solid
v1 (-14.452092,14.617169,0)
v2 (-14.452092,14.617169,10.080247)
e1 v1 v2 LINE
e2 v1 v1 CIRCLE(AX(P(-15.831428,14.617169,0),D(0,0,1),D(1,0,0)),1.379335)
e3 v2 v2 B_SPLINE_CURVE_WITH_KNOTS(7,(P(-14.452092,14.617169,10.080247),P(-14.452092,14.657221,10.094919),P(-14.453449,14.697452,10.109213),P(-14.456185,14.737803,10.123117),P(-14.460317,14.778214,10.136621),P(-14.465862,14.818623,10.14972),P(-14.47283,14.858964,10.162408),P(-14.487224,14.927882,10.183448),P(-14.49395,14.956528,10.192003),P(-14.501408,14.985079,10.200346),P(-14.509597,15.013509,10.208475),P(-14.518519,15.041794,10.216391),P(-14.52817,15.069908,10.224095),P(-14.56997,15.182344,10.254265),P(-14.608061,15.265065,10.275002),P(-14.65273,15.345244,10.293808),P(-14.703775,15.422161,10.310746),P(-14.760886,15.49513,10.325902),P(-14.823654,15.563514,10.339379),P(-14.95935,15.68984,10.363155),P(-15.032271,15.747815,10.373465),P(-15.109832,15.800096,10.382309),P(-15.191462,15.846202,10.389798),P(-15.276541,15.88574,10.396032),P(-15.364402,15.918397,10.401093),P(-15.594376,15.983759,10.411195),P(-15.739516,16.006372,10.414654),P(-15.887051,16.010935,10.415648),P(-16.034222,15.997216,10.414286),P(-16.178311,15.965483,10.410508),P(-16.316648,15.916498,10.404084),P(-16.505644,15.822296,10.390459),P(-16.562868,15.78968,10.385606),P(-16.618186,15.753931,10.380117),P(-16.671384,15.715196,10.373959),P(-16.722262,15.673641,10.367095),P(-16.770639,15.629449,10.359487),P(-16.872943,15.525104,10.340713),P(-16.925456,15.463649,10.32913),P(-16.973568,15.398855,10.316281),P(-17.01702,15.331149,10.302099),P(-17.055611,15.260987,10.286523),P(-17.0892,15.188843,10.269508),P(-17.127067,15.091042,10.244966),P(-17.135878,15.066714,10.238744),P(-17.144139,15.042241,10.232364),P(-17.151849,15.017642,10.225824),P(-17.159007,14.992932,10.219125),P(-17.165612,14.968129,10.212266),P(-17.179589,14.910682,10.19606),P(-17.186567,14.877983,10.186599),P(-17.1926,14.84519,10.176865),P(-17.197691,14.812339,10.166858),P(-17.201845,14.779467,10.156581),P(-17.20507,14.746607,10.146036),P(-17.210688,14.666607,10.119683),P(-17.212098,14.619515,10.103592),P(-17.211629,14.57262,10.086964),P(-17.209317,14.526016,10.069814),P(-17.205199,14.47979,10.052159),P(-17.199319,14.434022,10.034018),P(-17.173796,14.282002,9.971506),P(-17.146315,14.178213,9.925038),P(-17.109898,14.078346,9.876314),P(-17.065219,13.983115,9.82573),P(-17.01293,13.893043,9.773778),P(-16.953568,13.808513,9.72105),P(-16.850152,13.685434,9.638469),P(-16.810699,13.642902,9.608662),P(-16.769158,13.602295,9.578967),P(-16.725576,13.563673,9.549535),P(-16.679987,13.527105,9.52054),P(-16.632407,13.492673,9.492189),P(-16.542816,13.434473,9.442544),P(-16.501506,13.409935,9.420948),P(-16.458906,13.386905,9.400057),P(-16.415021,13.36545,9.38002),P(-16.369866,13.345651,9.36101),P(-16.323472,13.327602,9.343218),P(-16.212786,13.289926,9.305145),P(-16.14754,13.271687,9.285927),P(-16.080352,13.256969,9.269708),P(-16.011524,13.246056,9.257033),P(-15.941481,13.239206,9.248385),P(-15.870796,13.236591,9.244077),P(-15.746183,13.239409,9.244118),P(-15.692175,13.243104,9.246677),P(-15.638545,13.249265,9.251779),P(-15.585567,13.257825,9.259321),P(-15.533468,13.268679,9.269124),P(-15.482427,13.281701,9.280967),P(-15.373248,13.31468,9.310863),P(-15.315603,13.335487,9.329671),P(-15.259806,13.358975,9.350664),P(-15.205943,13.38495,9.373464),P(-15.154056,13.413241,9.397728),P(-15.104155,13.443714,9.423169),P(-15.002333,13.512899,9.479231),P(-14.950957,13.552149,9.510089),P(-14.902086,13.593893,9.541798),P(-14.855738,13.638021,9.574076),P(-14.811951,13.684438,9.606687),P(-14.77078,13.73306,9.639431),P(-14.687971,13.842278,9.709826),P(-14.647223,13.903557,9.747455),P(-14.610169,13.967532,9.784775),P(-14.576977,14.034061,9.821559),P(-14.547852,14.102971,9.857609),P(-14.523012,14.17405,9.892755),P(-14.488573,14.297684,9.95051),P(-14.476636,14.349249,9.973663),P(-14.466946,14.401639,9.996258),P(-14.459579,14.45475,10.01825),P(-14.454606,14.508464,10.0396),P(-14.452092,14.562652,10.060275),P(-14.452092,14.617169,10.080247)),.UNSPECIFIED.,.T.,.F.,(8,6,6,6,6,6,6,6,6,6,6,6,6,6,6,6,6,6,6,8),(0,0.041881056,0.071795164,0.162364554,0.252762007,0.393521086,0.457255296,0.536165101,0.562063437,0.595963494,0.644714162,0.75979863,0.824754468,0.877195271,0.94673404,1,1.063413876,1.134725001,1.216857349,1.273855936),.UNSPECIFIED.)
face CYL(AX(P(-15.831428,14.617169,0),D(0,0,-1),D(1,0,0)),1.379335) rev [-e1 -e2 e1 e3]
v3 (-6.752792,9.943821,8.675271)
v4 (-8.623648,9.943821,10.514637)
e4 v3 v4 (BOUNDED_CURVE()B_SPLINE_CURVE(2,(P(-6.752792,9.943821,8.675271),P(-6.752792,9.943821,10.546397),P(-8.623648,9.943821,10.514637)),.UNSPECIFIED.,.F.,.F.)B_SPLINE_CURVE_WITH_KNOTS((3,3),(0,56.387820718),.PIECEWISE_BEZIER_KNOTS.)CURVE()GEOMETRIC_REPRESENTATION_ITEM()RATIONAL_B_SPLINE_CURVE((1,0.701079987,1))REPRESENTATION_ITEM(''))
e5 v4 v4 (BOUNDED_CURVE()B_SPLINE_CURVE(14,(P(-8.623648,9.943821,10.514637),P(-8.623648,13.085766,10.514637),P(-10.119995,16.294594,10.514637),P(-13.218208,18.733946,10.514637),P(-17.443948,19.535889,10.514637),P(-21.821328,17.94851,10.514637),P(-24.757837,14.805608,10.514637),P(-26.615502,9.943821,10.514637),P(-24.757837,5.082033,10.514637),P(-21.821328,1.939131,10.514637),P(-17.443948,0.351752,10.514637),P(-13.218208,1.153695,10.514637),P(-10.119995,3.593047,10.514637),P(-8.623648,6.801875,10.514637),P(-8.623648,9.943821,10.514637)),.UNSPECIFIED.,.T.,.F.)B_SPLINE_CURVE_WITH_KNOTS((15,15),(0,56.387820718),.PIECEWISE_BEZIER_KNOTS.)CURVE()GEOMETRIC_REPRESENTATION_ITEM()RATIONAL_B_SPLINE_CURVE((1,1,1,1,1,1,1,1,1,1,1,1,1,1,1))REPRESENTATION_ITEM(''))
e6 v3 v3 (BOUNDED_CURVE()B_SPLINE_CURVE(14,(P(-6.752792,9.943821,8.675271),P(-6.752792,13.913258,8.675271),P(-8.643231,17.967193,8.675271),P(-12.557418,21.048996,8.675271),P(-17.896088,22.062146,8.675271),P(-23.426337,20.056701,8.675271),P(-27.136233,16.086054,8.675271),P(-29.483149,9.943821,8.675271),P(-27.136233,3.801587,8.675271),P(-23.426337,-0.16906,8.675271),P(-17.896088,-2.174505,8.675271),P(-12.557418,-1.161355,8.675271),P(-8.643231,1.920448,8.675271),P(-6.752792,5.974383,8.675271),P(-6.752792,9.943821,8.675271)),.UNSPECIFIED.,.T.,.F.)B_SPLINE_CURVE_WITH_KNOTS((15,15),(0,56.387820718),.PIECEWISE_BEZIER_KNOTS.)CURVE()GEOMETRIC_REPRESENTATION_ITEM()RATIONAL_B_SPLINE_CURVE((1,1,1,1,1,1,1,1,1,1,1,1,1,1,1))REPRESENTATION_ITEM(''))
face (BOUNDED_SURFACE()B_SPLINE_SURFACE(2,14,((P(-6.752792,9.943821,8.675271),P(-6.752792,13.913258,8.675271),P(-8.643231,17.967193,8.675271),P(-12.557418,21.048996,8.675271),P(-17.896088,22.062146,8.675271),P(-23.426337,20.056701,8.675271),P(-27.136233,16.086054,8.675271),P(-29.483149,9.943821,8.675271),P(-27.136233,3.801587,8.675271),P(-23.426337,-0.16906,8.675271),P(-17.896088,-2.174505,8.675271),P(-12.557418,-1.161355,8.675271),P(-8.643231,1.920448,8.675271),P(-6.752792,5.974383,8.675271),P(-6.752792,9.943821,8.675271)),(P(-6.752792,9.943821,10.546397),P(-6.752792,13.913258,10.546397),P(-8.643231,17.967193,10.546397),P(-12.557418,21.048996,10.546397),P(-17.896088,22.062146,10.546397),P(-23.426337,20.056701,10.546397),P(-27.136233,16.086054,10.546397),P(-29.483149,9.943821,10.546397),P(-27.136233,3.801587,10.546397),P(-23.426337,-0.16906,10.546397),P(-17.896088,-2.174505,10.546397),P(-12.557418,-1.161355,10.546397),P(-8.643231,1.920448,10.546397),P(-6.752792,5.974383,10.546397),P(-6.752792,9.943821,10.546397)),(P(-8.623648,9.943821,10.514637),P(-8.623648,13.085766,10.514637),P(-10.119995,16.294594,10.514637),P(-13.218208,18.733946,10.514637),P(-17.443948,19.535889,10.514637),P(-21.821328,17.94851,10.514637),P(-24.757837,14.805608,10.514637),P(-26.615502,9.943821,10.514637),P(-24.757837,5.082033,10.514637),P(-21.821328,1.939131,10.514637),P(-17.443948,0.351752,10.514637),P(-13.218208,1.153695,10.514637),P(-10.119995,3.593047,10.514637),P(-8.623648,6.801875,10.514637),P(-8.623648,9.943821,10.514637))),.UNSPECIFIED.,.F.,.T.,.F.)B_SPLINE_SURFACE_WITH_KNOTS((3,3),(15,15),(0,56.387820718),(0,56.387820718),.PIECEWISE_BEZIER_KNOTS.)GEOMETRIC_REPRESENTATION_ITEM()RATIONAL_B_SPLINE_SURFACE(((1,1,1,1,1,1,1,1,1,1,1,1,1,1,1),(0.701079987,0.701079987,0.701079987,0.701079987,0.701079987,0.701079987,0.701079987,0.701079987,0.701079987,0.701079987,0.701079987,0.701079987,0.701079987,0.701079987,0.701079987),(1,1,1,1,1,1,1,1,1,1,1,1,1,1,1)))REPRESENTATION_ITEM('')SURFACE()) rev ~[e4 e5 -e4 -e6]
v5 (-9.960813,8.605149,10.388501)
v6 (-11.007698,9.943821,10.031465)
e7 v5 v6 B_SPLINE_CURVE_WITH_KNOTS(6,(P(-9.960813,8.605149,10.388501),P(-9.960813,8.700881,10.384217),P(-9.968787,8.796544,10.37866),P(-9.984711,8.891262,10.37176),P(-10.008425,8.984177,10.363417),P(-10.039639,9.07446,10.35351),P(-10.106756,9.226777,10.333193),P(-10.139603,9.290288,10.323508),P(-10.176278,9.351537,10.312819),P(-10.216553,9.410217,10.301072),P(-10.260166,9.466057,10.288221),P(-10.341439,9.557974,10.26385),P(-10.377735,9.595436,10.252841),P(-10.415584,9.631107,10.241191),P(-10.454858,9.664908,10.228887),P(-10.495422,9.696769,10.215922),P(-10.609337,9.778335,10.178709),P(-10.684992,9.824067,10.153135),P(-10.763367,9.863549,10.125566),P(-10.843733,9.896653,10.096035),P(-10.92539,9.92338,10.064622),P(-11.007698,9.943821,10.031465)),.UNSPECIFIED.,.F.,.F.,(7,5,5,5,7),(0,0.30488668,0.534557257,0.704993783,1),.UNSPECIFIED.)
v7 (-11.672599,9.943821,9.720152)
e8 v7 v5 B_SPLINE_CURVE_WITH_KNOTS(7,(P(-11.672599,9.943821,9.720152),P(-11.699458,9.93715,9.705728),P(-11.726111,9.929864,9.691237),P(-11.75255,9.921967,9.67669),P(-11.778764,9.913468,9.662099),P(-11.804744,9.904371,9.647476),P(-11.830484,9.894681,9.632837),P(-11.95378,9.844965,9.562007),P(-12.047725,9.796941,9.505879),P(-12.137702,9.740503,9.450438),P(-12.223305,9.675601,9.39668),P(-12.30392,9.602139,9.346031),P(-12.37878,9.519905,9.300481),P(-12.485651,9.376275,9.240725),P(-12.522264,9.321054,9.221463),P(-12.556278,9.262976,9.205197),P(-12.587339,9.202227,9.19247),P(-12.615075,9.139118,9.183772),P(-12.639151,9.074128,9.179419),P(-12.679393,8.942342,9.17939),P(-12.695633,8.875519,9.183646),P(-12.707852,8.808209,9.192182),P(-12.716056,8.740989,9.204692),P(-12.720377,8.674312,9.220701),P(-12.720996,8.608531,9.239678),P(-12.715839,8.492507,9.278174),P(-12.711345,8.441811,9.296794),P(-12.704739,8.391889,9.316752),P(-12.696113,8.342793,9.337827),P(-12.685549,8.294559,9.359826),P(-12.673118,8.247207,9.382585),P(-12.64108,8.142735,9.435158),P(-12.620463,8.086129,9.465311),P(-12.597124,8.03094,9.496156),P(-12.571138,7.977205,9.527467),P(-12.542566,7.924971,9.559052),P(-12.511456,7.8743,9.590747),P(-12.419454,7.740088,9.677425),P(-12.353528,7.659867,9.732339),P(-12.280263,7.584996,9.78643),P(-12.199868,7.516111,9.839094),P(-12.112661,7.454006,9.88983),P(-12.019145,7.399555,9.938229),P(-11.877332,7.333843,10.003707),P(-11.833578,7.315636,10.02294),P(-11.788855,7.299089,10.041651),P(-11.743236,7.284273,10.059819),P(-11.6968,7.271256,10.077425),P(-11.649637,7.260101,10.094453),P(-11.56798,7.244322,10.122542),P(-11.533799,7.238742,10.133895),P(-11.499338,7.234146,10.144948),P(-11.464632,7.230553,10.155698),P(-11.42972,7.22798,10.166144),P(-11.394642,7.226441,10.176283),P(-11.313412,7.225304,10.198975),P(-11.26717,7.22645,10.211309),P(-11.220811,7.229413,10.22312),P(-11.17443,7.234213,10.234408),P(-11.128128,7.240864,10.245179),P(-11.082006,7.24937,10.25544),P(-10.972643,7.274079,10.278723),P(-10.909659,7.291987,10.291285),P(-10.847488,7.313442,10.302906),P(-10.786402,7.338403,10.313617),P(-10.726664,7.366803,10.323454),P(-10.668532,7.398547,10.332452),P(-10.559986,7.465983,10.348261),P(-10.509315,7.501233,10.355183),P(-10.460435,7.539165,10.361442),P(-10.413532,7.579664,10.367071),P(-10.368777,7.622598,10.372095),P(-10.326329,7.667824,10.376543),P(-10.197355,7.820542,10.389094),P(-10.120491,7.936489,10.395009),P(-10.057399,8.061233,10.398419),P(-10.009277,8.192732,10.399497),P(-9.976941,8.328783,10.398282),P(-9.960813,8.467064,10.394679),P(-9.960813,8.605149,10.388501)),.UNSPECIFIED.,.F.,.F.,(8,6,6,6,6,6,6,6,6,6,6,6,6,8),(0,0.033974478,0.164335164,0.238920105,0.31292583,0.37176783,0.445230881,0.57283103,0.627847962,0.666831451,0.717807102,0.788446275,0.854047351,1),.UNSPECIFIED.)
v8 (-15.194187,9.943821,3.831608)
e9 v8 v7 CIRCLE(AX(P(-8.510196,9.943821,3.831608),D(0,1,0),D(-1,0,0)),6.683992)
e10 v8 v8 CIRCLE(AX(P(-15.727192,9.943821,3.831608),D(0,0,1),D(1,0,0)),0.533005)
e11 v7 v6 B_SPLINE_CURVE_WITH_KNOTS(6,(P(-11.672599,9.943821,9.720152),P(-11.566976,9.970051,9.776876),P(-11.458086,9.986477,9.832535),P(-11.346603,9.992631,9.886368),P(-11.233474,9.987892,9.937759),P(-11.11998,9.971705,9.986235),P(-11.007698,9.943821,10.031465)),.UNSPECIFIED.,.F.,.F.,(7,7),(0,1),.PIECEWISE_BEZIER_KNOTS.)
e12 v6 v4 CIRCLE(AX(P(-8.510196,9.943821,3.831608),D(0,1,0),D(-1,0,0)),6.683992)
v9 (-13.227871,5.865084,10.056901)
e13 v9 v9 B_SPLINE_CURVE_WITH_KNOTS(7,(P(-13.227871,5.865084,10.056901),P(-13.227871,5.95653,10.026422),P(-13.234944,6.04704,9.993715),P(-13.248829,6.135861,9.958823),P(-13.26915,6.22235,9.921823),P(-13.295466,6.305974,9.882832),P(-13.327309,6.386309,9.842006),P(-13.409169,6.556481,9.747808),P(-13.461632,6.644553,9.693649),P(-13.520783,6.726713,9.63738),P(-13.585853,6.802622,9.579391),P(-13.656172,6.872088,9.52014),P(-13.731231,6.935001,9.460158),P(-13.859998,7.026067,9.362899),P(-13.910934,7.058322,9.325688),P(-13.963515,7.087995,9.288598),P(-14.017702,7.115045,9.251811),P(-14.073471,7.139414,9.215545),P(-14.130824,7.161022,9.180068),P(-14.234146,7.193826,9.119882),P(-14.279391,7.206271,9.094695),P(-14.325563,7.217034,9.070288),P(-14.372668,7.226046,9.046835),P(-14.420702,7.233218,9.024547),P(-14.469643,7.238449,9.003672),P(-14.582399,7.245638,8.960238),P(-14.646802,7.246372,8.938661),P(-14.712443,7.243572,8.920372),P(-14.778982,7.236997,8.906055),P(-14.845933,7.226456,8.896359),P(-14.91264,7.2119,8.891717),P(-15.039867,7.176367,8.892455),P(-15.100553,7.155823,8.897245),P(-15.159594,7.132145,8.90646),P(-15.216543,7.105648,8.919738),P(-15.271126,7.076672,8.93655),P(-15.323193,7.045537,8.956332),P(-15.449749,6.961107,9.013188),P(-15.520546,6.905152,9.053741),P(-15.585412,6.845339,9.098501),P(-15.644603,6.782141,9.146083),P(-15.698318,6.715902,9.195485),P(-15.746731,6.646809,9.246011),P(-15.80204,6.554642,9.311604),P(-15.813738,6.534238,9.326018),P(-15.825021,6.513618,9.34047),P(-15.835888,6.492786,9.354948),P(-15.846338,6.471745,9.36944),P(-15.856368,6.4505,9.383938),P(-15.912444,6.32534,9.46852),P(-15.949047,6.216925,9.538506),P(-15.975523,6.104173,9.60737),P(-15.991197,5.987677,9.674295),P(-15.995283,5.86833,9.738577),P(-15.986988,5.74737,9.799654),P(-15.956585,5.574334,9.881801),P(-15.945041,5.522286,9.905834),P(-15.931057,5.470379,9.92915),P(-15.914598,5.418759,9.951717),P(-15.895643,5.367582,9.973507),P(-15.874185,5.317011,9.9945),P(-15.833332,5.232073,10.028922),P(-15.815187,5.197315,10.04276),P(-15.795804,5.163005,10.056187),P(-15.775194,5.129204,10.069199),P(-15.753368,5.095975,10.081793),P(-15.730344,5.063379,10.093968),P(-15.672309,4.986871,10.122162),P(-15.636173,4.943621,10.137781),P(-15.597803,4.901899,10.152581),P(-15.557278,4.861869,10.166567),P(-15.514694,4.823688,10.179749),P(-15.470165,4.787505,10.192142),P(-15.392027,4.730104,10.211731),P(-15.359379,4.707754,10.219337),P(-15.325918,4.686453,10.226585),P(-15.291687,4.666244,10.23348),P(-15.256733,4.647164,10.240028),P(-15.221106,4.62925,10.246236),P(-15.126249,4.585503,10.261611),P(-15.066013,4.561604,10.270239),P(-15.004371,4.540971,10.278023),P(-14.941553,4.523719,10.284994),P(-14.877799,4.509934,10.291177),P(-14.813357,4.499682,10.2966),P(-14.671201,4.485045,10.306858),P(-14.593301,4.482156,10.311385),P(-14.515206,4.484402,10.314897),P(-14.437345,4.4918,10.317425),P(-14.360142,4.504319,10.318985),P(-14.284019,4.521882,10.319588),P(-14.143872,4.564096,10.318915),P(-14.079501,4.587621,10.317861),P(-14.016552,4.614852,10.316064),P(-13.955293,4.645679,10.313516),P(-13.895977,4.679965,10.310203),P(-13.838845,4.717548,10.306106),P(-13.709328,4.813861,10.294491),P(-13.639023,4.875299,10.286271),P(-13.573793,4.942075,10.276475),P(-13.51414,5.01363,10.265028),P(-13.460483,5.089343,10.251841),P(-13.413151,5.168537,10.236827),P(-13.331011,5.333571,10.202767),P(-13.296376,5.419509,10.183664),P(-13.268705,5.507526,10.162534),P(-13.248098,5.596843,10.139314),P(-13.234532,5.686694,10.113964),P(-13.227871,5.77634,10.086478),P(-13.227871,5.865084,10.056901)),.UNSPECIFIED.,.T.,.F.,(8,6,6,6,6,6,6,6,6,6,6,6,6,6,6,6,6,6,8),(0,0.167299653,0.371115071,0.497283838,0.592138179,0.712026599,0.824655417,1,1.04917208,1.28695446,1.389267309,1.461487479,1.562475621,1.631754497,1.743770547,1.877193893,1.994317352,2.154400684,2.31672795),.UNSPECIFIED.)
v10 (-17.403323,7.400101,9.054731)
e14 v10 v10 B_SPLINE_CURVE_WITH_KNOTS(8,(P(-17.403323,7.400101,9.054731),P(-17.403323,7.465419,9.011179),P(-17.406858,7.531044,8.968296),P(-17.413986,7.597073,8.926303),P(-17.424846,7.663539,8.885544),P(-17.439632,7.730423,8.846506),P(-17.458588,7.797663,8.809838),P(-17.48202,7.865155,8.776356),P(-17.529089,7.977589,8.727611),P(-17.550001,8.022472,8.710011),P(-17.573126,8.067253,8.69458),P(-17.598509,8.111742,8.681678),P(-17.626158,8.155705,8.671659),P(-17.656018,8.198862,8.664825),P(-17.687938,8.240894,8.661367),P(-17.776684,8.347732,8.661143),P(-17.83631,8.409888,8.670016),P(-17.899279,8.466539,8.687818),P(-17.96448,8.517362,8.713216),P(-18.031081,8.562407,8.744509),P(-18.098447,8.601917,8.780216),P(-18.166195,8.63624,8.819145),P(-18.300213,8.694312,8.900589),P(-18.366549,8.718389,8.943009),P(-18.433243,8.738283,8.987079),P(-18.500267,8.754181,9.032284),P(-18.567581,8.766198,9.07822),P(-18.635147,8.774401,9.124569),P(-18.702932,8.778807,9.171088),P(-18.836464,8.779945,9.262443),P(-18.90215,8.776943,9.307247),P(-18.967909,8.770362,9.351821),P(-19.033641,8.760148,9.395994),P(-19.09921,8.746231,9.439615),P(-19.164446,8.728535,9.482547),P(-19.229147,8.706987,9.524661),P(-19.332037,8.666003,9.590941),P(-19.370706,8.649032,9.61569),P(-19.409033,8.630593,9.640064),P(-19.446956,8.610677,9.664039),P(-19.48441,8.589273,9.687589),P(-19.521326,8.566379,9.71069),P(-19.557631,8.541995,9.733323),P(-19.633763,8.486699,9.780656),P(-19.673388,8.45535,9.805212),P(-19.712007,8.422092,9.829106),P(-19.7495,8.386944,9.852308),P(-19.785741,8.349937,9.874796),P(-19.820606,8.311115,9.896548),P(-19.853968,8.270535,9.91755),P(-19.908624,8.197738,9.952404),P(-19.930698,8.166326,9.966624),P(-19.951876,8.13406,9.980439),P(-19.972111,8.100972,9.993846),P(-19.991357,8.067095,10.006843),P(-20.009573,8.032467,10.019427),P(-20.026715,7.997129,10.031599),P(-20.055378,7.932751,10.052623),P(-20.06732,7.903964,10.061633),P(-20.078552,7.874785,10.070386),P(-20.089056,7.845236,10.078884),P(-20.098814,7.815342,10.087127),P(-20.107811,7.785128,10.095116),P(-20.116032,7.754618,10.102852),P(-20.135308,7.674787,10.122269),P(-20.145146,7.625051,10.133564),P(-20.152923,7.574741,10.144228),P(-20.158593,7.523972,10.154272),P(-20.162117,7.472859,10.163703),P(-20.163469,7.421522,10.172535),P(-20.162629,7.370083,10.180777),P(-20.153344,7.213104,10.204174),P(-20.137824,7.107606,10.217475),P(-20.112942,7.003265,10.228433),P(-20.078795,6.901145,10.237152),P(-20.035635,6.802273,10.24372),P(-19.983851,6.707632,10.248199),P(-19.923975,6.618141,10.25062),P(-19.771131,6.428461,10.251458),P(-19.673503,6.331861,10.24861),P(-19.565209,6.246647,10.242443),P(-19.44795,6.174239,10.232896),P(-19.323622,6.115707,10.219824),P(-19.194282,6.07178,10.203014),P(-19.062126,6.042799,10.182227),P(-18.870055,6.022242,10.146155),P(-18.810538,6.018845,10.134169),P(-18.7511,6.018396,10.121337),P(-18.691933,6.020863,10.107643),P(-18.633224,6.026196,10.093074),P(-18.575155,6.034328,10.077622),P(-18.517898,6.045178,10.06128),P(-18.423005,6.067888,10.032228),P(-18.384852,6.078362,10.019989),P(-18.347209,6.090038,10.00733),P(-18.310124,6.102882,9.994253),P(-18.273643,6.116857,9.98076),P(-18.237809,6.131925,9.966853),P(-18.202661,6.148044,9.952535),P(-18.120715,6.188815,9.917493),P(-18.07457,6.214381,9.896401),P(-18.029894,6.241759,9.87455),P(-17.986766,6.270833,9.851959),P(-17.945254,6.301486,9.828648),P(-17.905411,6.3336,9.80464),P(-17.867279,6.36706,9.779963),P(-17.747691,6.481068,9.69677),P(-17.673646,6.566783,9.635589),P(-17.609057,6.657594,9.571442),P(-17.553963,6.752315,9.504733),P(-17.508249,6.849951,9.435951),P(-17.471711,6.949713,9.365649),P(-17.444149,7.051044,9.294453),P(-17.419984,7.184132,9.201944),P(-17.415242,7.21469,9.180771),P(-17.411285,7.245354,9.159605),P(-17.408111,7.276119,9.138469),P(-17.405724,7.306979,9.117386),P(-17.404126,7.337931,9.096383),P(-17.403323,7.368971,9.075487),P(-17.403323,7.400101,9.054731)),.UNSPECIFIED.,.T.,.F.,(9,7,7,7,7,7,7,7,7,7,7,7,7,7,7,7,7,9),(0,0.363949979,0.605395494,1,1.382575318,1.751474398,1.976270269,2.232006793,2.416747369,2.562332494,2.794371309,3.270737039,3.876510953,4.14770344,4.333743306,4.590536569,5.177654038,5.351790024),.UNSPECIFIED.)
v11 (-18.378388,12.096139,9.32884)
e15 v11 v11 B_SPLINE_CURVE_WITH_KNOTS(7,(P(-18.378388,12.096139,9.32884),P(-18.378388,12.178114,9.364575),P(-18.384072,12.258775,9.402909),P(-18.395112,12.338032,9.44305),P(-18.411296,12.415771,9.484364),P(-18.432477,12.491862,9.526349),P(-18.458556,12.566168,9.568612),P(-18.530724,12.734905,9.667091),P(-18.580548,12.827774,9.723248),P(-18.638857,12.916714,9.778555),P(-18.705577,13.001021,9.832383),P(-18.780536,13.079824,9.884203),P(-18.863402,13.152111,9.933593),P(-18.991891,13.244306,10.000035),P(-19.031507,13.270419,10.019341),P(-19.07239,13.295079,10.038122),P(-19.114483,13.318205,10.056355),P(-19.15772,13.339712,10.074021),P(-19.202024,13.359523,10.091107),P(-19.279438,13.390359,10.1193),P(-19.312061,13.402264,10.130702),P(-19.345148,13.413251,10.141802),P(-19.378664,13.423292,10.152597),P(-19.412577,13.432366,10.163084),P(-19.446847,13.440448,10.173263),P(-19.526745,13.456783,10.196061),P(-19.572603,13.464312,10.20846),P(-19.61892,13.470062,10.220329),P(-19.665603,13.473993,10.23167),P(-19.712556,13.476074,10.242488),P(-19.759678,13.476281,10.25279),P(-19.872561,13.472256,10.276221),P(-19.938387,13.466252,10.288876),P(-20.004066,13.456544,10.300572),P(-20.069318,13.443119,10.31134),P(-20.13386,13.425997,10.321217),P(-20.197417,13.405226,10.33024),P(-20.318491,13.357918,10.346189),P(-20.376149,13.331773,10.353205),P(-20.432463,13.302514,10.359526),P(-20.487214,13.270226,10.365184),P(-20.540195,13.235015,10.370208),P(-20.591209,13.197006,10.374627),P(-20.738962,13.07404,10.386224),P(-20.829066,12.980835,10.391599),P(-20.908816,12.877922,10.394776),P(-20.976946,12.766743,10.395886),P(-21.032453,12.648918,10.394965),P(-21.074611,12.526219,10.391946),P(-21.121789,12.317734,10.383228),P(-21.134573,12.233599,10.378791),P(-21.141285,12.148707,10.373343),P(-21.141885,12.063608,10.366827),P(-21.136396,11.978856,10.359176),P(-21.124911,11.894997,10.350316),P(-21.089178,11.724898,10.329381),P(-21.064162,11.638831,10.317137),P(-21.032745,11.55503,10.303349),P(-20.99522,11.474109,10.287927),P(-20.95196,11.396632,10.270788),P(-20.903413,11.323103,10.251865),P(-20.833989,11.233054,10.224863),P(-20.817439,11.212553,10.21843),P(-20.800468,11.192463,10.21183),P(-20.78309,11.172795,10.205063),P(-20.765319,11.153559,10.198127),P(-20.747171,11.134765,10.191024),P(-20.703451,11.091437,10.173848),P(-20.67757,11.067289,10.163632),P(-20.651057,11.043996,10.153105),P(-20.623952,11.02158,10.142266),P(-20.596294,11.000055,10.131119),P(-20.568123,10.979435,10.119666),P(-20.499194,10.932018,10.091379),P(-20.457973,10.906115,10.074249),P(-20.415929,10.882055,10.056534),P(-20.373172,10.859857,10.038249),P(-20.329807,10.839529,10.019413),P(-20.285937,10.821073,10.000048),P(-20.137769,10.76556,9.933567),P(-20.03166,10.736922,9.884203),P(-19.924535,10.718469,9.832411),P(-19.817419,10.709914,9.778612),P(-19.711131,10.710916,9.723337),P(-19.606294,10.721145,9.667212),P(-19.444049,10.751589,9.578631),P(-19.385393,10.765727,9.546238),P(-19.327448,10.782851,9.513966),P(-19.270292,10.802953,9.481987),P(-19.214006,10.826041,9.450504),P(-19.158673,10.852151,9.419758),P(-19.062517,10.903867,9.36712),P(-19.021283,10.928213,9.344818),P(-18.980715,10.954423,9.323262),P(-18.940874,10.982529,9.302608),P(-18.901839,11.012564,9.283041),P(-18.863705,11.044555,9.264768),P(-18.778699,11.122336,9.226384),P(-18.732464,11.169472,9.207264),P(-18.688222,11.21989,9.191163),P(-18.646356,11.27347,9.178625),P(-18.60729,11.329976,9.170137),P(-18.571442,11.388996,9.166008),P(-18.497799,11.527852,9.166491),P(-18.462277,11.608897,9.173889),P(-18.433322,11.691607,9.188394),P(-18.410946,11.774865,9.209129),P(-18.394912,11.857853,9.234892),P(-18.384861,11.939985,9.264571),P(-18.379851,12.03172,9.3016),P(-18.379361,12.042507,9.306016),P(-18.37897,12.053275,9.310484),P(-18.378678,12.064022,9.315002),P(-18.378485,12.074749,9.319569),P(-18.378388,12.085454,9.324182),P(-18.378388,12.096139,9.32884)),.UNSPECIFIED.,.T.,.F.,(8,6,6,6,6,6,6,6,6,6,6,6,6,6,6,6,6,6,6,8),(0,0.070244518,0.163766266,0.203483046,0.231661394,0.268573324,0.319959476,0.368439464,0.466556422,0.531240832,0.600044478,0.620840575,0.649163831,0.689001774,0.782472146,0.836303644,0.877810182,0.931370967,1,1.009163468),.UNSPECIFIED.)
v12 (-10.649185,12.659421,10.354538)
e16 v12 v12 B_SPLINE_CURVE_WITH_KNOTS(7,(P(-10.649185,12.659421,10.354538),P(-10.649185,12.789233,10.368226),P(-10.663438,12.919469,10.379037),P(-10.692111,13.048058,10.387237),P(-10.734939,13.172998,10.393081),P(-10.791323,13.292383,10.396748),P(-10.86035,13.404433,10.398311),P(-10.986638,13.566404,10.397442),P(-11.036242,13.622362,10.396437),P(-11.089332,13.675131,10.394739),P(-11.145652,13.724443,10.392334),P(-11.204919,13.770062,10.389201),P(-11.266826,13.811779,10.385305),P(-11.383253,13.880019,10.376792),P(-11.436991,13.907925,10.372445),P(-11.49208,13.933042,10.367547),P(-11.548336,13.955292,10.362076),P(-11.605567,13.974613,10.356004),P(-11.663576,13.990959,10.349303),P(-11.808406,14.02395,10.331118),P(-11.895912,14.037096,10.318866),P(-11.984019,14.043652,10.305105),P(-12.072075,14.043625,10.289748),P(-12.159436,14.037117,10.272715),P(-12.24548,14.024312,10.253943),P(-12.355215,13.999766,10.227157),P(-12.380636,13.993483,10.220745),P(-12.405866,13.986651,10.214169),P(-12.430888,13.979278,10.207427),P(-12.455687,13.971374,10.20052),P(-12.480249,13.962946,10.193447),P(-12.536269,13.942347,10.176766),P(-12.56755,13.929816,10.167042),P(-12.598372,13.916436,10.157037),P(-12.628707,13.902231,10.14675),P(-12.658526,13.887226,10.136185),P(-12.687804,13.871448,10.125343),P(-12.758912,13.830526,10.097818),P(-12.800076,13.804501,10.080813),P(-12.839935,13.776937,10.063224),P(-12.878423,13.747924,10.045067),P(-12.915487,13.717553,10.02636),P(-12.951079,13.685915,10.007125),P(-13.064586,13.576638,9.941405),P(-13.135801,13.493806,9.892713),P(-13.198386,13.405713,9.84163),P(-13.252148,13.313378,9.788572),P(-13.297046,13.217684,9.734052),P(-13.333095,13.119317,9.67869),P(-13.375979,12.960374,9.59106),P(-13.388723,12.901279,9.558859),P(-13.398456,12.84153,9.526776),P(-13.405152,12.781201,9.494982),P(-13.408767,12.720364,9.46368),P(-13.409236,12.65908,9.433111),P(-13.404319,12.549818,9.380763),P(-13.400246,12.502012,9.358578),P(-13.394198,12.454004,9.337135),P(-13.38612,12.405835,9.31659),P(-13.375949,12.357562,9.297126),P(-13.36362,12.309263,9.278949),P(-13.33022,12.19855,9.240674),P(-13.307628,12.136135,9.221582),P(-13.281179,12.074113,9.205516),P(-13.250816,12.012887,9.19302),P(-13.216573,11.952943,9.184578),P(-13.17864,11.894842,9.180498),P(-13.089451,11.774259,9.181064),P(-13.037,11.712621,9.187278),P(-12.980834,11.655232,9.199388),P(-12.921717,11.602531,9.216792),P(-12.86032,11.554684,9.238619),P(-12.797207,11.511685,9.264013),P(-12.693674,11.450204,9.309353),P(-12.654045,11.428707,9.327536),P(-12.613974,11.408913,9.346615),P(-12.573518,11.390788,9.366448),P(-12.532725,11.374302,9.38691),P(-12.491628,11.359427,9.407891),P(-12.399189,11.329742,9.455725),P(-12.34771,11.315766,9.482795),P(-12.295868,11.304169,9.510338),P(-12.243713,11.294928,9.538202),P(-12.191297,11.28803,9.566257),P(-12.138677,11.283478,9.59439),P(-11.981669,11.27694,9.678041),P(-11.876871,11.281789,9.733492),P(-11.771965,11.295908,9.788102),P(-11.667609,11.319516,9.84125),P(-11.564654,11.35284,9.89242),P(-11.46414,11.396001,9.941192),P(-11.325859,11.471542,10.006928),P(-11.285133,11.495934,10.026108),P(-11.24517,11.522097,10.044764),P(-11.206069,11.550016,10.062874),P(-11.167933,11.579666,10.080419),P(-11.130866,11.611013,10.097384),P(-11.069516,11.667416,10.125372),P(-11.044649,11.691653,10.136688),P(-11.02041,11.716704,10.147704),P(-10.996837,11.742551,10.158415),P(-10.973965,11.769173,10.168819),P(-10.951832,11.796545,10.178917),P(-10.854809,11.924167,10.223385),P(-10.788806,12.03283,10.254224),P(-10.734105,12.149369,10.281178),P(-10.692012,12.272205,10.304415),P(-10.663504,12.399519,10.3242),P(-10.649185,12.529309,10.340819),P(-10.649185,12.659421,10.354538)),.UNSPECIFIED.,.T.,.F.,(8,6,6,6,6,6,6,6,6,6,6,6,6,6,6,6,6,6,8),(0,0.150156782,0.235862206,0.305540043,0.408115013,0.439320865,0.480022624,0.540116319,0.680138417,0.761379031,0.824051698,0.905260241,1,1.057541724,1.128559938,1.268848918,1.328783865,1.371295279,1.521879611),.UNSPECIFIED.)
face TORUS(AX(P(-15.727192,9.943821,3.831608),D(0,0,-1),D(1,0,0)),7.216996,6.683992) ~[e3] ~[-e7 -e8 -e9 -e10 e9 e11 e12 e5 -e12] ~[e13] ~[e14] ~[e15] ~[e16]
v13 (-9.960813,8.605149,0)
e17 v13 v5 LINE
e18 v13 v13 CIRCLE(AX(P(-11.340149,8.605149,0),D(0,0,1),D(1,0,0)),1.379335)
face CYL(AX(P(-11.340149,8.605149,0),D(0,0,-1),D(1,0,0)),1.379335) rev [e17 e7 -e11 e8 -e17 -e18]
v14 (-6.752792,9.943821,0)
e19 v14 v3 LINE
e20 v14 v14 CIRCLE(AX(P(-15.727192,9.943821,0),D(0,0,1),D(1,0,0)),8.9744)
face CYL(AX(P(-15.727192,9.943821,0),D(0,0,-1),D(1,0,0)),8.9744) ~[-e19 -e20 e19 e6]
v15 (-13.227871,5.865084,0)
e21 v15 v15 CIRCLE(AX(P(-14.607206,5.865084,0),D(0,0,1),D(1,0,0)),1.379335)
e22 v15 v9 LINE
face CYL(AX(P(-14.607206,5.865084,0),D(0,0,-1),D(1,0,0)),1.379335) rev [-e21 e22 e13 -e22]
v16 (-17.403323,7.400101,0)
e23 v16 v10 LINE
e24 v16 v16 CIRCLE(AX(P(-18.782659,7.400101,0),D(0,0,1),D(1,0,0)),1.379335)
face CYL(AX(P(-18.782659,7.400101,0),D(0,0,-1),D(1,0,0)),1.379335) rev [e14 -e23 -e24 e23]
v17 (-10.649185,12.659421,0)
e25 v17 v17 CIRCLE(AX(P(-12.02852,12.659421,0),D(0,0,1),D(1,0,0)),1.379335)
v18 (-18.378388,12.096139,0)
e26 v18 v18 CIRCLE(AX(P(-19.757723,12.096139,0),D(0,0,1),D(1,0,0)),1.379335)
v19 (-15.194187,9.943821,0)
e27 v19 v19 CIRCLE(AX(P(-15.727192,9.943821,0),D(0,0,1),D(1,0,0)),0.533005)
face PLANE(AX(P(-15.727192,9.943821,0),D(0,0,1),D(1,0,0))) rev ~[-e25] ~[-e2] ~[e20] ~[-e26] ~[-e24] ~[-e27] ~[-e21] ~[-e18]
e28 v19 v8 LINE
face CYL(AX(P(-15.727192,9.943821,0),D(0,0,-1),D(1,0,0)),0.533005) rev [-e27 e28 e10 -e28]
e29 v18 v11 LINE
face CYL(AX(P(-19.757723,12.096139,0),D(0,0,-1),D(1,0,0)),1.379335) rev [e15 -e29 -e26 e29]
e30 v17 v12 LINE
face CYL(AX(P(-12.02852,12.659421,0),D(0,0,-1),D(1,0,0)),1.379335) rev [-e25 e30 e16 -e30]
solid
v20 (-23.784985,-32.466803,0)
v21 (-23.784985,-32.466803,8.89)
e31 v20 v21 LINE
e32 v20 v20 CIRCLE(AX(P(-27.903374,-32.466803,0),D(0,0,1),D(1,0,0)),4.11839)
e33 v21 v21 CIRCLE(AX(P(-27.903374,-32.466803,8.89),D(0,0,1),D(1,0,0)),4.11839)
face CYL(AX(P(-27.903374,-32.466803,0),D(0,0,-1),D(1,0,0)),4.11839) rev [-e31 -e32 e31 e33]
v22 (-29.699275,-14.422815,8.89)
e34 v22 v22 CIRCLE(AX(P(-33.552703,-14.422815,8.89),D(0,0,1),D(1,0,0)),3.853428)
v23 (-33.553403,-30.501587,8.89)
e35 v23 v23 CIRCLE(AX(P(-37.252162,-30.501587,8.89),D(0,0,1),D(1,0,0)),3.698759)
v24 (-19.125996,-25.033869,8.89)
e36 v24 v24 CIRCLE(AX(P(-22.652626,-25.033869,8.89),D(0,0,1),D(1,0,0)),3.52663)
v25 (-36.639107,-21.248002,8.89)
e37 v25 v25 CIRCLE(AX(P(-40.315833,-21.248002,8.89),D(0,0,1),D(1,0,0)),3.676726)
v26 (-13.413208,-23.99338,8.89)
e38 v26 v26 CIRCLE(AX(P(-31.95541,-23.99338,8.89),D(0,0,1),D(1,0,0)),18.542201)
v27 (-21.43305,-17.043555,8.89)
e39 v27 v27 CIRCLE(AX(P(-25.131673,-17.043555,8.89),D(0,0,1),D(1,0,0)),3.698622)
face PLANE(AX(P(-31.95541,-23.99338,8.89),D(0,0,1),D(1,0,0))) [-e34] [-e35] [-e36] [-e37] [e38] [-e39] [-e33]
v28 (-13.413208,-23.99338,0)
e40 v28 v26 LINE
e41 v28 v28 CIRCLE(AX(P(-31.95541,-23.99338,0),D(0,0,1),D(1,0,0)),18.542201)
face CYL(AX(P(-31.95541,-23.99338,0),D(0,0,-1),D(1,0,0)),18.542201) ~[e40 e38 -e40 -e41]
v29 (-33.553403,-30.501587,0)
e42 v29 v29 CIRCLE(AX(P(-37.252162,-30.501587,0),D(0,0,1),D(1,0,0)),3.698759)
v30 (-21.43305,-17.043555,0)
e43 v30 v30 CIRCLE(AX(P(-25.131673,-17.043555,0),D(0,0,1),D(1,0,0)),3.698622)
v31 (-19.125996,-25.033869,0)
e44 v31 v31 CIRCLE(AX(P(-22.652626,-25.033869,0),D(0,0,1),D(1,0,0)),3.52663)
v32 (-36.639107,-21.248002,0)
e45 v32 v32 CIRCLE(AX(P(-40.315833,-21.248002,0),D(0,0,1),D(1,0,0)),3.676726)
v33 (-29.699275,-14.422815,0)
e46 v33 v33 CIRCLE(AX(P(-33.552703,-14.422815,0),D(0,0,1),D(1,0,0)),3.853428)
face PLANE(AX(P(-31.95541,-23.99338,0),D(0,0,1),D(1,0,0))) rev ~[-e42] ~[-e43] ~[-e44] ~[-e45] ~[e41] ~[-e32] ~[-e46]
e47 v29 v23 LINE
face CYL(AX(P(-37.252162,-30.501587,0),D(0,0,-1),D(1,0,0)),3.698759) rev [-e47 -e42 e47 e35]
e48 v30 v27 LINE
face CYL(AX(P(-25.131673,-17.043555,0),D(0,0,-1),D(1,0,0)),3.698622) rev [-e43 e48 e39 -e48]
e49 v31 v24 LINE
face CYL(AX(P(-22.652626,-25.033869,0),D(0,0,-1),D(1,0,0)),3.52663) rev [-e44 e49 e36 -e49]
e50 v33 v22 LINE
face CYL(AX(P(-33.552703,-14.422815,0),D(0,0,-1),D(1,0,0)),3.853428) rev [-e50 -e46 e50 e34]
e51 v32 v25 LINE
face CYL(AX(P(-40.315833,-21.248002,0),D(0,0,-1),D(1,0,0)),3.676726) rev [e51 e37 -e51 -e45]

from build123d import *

# Parameters (mm, degrees)
F0_R     = 8.9744003975
F0_R_2   = 1.379335325
F0_R_3   = 0.5330047415
F1_DEPTH = 10.5156
F3_R     = 1.8396307345
F4_R     = 18.5422013788
F4_R_2   = 3.6987589535
F4_R_3   = 4.1183896775
F4_R_4   = 3.5266295723
F4_R_5   = 3.6767259014
F4_R_6   = 3.8534276879
F4_R_7   = 3.6986222034
F5_DEPTH = 8.89


# Not quite as in the source:
# - a fillet or chamfer that OpenCascade refuses, or shapes differently, is made with other operations: its cross-section is extruded or revolved along the edge and cut away or added


with BuildPart() as f1:
    # F0 (on Top) → F1 (new body)
    with BuildSketch(Plane.XY):
        with Locations((-15.7271921635, 9.9438205361)):
            Circle(F0_R)
        with Locations((-18.7826585025, 7.4001010507)):
            Circle(F0_R_2, mode=Mode.SUBTRACT)
        with Locations((-14.607205987, 5.8650835417)):
            Circle(F0_R_2, mode=Mode.SUBTRACT)
        with Locations((-11.340148747, 8.6051486433)):
            Circle(F0_R_2, mode=Mode.SUBTRACT)
        with Locations((-19.7577234358, 12.096138671)):
            Circle(F0_R_2, mode=Mode.SUBTRACT)
        with Locations((-15.8314276487, 14.6171692759)):
            Circle(F0_R_2, mode=Mode.SUBTRACT)
        with Locations((-15.7271921635, 9.9438205361)):
            Circle(F0_R_3, mode=Mode.SUBTRACT)
        with Locations((-12.0285199955, 12.6594211906)):
            Circle(F0_R_2, mode=Mode.SUBTRACT)
    extrude(amount=F1_DEPTH)

    # F2: fillet of radius 6.6839916688 on 1 edges, made by hand

    # F2_s1 → F2_t2 (revolve, cut)
    with BuildSketch(Plane.XZ.offset(-9.9438205361)):
        with BuildLine():
            ThreePointArc((-15.194187422, 3.8316083312), (-13.2364915876, 8.5579041656), (-8.5101957532, 10.5156))
            Line((-8.5101957532, 10.5156), (-15.194187422, 10.5156))
            Line((-15.194187422, 10.5156), (-15.194187422, 3.8316083312))
        make_face()
    revolve(axis=Axis((-15.7271921635, 9.9438205361, 10.5156), (0, 0, 1)), mode=Mode.SUBTRACT)

    # F3
    f3_edges = [f1.edges().sort_by_distance(p)[0] for p in [
        (-24.701593, 9.943821, 10.5156),
    ]]
    fillet(f3_edges, radius=F3_R)


with BuildPart() as f5:
    # F4 (on Top) → F5 (new body)
    with BuildSketch(Plane.XY):
        with Locations((-31.955409795, -23.9933803678)):
            Circle(F4_R)
        with Locations((-37.2521616518, -30.5015873164)):
            Circle(F4_R_2, mode=Mode.SUBTRACT)
        with Locations((-27.9033742845, -32.4668027461)):
            Circle(F4_R_3, mode=Mode.SUBTRACT)
        with Locations((-22.6526260376, -25.0338688493)):
            Circle(F4_R_4, mode=Mode.SUBTRACT)
        with Locations((-40.3158329427, -21.2480016053)):
            Circle(F4_R_5, mode=Mode.SUBTRACT)
        with Locations((-33.5527025163, -14.4228152931)):
            Circle(F4_R_6, mode=Mode.SUBTRACT)
        with Locations((-25.1316726208, -17.0435551554)):
            Circle(F4_R_7, mode=Mode.SUBTRACT)
    extrude(amount=F5_DEPTH)


solid = Compound([f1.part, f5.part])
